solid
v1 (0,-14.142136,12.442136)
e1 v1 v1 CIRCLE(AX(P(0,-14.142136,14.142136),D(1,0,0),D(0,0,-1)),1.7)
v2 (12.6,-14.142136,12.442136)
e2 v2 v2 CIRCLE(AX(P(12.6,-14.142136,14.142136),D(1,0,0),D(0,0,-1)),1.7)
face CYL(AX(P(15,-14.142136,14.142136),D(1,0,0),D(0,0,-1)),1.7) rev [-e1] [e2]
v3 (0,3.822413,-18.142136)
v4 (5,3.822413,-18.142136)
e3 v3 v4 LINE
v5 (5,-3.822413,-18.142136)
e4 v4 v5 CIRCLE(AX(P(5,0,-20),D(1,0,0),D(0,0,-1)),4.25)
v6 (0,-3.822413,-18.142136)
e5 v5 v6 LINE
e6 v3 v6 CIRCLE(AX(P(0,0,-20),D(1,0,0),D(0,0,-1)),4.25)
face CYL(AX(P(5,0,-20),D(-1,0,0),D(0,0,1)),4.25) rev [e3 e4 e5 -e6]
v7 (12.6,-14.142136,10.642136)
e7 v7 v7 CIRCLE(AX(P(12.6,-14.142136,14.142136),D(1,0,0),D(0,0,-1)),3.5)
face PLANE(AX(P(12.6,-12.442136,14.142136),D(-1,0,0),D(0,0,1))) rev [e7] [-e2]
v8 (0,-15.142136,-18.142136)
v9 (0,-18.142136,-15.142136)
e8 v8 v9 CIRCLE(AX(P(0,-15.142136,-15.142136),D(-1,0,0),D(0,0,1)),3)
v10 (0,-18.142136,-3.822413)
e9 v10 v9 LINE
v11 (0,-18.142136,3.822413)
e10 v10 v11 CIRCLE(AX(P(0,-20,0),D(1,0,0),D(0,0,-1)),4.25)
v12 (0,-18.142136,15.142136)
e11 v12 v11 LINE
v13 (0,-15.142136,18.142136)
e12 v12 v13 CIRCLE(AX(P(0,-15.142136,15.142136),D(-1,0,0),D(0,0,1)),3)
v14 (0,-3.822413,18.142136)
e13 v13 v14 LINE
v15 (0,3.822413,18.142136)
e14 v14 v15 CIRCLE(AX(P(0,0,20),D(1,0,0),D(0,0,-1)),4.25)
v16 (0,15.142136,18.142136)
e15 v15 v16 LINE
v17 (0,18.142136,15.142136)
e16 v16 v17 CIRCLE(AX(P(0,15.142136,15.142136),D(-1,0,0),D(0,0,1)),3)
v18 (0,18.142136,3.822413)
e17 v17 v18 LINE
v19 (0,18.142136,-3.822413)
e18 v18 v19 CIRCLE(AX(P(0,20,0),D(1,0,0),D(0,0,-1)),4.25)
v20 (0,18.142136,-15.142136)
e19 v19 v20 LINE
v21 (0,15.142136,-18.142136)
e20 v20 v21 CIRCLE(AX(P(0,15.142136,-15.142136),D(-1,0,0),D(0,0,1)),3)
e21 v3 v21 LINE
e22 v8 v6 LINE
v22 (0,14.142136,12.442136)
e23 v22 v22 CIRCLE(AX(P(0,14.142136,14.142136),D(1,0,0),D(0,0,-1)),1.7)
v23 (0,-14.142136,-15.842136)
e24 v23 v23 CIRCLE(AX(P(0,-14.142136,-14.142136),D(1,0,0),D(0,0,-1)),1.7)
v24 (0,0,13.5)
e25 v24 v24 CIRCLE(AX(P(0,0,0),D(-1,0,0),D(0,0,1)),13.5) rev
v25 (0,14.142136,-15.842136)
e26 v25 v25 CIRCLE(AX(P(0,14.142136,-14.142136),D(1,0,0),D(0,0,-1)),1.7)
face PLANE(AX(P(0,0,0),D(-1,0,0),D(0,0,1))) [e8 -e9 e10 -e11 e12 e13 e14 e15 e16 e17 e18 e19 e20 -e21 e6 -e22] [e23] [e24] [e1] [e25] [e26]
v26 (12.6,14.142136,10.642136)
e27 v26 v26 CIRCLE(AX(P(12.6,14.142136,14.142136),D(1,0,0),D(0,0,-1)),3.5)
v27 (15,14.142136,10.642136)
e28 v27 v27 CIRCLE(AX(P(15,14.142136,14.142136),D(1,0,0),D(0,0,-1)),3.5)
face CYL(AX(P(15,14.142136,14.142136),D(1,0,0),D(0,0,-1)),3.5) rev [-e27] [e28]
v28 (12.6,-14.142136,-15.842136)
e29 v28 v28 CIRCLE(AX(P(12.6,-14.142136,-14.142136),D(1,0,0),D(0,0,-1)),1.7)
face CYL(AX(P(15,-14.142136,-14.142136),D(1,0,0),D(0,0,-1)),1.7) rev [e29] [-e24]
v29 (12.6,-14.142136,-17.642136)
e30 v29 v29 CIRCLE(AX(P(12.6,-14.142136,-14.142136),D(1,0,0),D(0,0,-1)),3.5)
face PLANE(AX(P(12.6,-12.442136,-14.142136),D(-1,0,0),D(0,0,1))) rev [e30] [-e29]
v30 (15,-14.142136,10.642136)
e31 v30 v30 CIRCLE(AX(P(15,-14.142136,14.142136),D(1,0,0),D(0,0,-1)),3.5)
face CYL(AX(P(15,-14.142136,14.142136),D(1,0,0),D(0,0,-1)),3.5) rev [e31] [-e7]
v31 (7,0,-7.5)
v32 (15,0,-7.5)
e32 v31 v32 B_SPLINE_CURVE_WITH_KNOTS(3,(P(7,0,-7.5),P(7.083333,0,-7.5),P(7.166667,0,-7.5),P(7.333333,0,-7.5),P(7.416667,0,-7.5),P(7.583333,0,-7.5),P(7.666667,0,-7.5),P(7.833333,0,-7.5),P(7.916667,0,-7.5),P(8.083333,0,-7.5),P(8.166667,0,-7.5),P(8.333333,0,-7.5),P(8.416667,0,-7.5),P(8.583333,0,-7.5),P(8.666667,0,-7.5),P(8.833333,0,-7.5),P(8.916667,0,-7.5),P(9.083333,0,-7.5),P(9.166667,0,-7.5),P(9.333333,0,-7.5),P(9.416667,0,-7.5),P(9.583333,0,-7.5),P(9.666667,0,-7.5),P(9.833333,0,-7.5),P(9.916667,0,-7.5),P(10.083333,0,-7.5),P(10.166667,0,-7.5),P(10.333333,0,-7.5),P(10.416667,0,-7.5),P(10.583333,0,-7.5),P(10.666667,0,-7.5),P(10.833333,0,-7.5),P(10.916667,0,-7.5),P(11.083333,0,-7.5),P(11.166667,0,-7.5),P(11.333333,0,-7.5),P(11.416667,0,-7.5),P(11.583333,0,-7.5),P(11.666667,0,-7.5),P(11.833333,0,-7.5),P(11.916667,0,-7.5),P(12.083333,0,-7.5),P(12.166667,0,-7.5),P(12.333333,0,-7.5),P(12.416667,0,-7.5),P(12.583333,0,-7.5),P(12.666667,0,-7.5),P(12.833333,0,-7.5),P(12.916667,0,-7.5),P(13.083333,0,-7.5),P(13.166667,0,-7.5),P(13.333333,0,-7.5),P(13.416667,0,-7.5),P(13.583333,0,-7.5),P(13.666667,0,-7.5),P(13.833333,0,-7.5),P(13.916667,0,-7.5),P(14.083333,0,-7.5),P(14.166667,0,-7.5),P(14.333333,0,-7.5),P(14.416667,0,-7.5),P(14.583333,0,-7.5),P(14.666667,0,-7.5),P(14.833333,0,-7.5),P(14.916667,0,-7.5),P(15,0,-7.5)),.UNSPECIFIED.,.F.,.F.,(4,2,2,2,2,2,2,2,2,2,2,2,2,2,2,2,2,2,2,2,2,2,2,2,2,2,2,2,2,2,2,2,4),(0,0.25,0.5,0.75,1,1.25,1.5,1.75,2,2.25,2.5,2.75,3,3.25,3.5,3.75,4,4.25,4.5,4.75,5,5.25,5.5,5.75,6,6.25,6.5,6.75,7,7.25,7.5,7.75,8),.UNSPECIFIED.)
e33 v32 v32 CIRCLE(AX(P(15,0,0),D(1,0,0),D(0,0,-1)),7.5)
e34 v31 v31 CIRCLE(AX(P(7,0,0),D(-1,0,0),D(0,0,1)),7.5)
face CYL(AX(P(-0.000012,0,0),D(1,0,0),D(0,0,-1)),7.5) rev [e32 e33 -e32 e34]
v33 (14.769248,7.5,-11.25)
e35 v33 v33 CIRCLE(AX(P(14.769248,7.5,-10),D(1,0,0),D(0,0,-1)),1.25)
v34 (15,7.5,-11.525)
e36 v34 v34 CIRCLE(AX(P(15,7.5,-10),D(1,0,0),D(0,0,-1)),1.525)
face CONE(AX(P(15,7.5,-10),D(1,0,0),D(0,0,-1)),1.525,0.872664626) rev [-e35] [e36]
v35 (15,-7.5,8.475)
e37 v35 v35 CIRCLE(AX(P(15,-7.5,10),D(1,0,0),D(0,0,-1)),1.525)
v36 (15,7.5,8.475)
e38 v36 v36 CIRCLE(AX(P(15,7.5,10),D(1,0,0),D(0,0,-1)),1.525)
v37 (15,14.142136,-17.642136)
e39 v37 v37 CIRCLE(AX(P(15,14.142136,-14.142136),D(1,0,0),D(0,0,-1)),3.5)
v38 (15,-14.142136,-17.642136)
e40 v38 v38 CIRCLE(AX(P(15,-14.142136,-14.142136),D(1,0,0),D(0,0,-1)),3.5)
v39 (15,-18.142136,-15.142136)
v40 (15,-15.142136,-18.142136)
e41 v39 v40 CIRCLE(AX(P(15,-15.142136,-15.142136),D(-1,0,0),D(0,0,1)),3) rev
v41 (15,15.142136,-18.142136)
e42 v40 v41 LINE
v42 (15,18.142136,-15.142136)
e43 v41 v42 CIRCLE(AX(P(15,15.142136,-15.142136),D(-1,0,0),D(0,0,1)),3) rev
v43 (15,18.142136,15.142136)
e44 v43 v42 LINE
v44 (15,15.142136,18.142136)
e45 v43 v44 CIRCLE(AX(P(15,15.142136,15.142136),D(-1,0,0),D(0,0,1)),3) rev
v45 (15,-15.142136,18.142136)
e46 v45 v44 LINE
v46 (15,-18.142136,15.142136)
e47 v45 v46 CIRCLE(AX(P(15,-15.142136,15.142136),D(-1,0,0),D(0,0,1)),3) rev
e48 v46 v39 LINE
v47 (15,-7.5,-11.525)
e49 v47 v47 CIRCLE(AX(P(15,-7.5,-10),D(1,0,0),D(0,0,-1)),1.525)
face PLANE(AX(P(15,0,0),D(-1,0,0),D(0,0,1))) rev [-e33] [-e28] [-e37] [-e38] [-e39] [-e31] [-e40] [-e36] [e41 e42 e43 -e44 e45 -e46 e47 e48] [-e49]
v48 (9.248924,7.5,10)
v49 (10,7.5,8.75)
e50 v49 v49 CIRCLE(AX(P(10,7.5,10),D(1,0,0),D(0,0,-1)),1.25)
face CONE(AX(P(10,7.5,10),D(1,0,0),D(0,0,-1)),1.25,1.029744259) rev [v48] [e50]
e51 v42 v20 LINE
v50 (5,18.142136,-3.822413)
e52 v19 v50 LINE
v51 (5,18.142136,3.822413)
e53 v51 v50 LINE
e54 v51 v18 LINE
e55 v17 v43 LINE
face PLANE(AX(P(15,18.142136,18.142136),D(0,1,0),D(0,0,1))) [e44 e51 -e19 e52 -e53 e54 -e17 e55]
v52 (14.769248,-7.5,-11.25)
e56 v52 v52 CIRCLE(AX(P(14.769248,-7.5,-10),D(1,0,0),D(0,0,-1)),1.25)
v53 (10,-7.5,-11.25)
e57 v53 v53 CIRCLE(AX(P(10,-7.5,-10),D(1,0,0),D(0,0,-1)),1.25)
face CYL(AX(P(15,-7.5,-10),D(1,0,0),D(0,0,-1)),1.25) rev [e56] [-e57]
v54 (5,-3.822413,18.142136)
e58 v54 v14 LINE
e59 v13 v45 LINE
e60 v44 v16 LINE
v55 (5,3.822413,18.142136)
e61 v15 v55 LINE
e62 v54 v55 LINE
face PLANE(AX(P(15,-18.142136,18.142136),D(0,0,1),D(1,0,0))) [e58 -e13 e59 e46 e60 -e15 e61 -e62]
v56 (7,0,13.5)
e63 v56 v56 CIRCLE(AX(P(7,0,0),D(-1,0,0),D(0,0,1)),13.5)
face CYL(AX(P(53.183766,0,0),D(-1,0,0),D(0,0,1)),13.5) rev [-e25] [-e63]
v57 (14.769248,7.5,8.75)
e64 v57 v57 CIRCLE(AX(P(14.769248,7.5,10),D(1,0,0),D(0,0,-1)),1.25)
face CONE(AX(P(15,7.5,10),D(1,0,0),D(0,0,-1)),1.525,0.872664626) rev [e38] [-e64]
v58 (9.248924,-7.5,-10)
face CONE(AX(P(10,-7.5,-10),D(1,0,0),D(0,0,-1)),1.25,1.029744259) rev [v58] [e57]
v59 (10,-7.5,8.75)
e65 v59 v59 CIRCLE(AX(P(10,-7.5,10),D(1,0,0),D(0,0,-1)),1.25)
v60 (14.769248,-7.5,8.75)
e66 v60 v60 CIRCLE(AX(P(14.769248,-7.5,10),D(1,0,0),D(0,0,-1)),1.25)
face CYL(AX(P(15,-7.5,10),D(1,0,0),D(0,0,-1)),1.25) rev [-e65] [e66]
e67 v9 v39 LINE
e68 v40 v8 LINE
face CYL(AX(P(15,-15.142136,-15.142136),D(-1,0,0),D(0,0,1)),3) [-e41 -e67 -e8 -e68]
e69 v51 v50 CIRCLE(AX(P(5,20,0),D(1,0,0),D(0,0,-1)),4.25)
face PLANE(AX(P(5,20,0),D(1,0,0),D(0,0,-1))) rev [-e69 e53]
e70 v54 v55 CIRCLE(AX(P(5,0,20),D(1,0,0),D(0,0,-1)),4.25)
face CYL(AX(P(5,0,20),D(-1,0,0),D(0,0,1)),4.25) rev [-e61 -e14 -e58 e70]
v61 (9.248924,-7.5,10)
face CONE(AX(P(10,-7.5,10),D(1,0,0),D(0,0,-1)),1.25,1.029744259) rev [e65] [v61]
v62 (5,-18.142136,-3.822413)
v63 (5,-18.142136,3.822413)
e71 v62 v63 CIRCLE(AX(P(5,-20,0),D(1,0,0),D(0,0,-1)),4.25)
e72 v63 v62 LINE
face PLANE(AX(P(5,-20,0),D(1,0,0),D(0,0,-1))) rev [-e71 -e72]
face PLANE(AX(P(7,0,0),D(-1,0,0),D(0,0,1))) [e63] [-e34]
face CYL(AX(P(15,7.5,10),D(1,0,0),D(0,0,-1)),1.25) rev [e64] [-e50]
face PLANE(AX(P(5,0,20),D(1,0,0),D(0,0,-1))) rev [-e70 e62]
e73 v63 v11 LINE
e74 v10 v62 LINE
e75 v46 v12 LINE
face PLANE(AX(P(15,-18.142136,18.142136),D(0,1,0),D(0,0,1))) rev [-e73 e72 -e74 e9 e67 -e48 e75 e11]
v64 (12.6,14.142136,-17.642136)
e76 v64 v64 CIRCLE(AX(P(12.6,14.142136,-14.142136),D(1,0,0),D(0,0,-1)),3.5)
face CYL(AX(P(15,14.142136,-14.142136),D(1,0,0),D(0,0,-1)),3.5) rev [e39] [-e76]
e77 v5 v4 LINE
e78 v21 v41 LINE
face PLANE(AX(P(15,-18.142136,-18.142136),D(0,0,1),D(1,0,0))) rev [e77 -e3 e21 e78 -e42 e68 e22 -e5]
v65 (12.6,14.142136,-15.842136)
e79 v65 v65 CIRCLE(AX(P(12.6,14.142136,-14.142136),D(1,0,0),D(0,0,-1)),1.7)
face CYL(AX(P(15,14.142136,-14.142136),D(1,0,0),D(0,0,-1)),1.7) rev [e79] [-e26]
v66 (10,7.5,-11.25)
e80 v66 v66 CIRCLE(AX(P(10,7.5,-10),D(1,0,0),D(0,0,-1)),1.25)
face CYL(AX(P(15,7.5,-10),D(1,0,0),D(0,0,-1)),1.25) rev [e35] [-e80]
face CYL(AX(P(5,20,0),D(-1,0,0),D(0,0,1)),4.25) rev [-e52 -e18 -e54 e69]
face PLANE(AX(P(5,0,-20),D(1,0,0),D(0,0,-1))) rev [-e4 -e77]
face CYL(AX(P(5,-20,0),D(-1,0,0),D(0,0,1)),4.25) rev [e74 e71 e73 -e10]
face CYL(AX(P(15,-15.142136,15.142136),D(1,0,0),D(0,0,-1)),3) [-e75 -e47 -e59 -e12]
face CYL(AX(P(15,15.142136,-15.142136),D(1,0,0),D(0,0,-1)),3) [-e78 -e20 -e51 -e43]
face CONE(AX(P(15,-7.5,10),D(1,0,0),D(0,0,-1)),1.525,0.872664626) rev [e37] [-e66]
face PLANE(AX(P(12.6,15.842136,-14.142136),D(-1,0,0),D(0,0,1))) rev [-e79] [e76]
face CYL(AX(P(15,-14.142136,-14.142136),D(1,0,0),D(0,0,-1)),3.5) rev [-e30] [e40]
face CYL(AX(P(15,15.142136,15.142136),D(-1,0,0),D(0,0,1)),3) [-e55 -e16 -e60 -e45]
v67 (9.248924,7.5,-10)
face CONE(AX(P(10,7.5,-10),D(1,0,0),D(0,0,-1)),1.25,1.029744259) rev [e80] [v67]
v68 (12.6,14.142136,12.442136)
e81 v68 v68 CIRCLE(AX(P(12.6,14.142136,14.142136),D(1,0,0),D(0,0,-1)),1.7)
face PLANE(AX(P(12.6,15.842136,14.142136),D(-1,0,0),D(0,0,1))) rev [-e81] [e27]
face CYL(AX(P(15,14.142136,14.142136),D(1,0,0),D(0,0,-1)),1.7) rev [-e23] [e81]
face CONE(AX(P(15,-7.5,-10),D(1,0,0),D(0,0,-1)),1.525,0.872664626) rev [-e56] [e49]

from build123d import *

# Parameters (mm, degrees)
SKETCH1_W                                        = 36.284271248
SKETCH1_H                                        = 36.284271248
BOSS_EXTRUDE1_DEPTH                              = 15
CUT_EXTRUDE1_DEPTH                               = 7
CUT_EXTRUDE1_DEPTH_BACK                          = 30.719928835
SKETCH1_4_R                                      = 13.5
SKETCH1_4_R_2                                    = 7.5
CUT_EXTRUDE2_DEPTH                               = 30.719928835
CUT_EXTRUDE2_DEPTH_BACK                          = 30.719928835
SKETCH1_5_R                                      = 7.5
FILLET1_R                                        = 3
CBORE_FOR_M3_PAN_HEAD_MACHINE_SCREW1_D           = 3.4
CBORE_FOR_M3_PAN_HEAD_MACHINE_SCREW1_CBORE_D     = 7
CBORE_FOR_M3_PAN_HEAD_MACHINE_SCREW1_CBORE_DEPTH = 2.4
SKETCH1_6_R                                      = 4.25
CUT_EXTRUDE3_DEPTH                               = 5


# Read off the part's stored shape, not the designer's step: M3x0.5 Tapped Hole1
with BuildPart() as part:
    # Sketch1 → Boss-Extrude1 (new body)
    with BuildSketch(Plane(origin=(0, 0, 0), x_dir=(0, 0, -1), z_dir=(1, 0, 0))):
        Rectangle(SKETCH1_W, SKETCH1_H)
    extrude(amount=BOSS_EXTRUDE1_DEPTH)

    # Sketch1<4> → Cut-Extrude1 (cut, two sides: drawn at the far end of the back side and taken through both)
    with BuildSketch(Plane(origin=(0, 0, 0), x_dir=(0, 0, -1), z_dir=(1, 0, 0)).offset(-CUT_EXTRUDE1_DEPTH_BACK)):
        with Locations(Location((0, 0, 0), (0, 0, 180))):
            Circle(SKETCH1_4_R)
        with Locations(Location((0, 0, 0), (0, 0, 180))):
            Circle(SKETCH1_4_R_2, mode=Mode.SUBTRACT)
    extrude(amount=CUT_EXTRUDE1_DEPTH + CUT_EXTRUDE1_DEPTH_BACK, mode=Mode.SUBTRACT)

    # Sketch1<5> → Cut-Extrude2 (cut, two sides: drawn at the far end of the back side and taken through both)
    with BuildSketch(Plane(origin=(0, 0, 0), x_dir=(0, 0, -1), z_dir=(1, 0, 0)).offset(-CUT_EXTRUDE2_DEPTH_BACK)):
        Circle(SKETCH1_5_R)
    extrude(amount=CUT_EXTRUDE2_DEPTH + CUT_EXTRUDE2_DEPTH_BACK, mode=Mode.SUBTRACT)

    # M3x0.5 Tapped Hole1 outline → M3x0.5 Tapped Hole1 (revolve, cut)
    with BuildSketch(Plane(origin=(0, -7.5, -10), x_dir=(0, 1, 0), z_dir=(0, 0, -1))):
        Polygon((0, 15), (0, 9.248924226), (1.25, 10), (1.25, 14.769247601), (1.525, 15), align=None)
    revolve(axis=Axis((0, -7.5, -10), (1, 0, 0)), mode=Mode.SUBTRACT)

    # M3x0.5 Tapped Hole1 2 outline → M3x0.5 Tapped Hole1 2 (revolve, cut)
    with BuildSketch(Plane(origin=(0, 7.5, 10), x_dir=(0, 1, 0), z_dir=(0, 0, -1))):
        Polygon((0, 15), (0, 9.248924226), (1.25, 10), (1.25, 14.769247601), (1.525, 15), align=None)
    revolve(axis=Axis((0, 7.5, 10), (1, 0, 0)), mode=Mode.SUBTRACT)

    # M3x0.5 Tapped Hole1 3 outline → M3x0.5 Tapped Hole1 3 (revolve, cut)
    with BuildSketch(Plane(origin=(0, -7.5, 10), x_dir=(0, 1, 0), z_dir=(0, 0, -1))):
        Polygon((0, 15), (0, 9.248924226), (1.25, 10), (1.25, 14.769247601), (1.525, 15), align=None)
    revolve(axis=Axis((0, -7.5, 10), (1, 0, 0)), mode=Mode.SUBTRACT)

    # M3x0.5 Tapped Hole1 4 outline → M3x0.5 Tapped Hole1 4 (revolve, cut)
    with BuildSketch(Plane(origin=(0, 7.5, -10), x_dir=(0, 1, 0), z_dir=(0, 0, -1))):
        Polygon((0, 15), (0, 9.248924226), (1.25, 10), (1.25, 14.769247601), (1.525, 15), align=None)
    revolve(axis=Axis((0, 7.5, -10), (1, 0, 0)), mode=Mode.SUBTRACT)

    # Fillet1
    fillet1_edges = [part.edges().sort_by_distance(p)[0] for p in [
        (7.5, -18.142135624, 18.142135624),
        (7.5, -18.142135624, -18.142135624),
        (7.5, 18.142135624, -18.142135624),
        (7.5, 18.142135624, 18.142135624),
    ]]
    fillet(fillet1_edges, radius=FILLET1_R)

    # CBORE for M3 Pan Head Machine Screw1 (through all)
    with Locations(Plane(origin=(15, 0, 0), x_dir=(0, 0, -1), z_dir=(1, 0, 0))):
        with Locations((14.142135624, 14.142135624), (-14.142135624, 14.142135624), (-14.142135624, -14.142135624), (14.142135624, -14.142135624)):
            CounterBoreHole(CBORE_FOR_M3_PAN_HEAD_MACHINE_SCREW1_D / 2, CBORE_FOR_M3_PAN_HEAD_MACHINE_SCREW1_CBORE_D / 2, CBORE_FOR_M3_PAN_HEAD_MACHINE_SCREW1_CBORE_DEPTH)

    # Sketch1<6> → Cut-Extrude3 (cut)
    with BuildSketch(Plane(origin=(0, 0, 0), x_dir=(0, 0, -1), z_dir=(1, 0, 0))):
        with Locations((0, 20)):
            Circle(SKETCH1_6_R)
        with Locations((0, -20)):
            Circle(SKETCH1_6_R)
        with Locations((20, 0)):
            Circle(SKETCH1_6_R)
        with Locations((-20, 0)):
            Circle(SKETCH1_6_R)
    extrude(amount=CUT_EXTRUDE3_DEPTH, mode=Mode.SUBTRACT)


solid = part.part
